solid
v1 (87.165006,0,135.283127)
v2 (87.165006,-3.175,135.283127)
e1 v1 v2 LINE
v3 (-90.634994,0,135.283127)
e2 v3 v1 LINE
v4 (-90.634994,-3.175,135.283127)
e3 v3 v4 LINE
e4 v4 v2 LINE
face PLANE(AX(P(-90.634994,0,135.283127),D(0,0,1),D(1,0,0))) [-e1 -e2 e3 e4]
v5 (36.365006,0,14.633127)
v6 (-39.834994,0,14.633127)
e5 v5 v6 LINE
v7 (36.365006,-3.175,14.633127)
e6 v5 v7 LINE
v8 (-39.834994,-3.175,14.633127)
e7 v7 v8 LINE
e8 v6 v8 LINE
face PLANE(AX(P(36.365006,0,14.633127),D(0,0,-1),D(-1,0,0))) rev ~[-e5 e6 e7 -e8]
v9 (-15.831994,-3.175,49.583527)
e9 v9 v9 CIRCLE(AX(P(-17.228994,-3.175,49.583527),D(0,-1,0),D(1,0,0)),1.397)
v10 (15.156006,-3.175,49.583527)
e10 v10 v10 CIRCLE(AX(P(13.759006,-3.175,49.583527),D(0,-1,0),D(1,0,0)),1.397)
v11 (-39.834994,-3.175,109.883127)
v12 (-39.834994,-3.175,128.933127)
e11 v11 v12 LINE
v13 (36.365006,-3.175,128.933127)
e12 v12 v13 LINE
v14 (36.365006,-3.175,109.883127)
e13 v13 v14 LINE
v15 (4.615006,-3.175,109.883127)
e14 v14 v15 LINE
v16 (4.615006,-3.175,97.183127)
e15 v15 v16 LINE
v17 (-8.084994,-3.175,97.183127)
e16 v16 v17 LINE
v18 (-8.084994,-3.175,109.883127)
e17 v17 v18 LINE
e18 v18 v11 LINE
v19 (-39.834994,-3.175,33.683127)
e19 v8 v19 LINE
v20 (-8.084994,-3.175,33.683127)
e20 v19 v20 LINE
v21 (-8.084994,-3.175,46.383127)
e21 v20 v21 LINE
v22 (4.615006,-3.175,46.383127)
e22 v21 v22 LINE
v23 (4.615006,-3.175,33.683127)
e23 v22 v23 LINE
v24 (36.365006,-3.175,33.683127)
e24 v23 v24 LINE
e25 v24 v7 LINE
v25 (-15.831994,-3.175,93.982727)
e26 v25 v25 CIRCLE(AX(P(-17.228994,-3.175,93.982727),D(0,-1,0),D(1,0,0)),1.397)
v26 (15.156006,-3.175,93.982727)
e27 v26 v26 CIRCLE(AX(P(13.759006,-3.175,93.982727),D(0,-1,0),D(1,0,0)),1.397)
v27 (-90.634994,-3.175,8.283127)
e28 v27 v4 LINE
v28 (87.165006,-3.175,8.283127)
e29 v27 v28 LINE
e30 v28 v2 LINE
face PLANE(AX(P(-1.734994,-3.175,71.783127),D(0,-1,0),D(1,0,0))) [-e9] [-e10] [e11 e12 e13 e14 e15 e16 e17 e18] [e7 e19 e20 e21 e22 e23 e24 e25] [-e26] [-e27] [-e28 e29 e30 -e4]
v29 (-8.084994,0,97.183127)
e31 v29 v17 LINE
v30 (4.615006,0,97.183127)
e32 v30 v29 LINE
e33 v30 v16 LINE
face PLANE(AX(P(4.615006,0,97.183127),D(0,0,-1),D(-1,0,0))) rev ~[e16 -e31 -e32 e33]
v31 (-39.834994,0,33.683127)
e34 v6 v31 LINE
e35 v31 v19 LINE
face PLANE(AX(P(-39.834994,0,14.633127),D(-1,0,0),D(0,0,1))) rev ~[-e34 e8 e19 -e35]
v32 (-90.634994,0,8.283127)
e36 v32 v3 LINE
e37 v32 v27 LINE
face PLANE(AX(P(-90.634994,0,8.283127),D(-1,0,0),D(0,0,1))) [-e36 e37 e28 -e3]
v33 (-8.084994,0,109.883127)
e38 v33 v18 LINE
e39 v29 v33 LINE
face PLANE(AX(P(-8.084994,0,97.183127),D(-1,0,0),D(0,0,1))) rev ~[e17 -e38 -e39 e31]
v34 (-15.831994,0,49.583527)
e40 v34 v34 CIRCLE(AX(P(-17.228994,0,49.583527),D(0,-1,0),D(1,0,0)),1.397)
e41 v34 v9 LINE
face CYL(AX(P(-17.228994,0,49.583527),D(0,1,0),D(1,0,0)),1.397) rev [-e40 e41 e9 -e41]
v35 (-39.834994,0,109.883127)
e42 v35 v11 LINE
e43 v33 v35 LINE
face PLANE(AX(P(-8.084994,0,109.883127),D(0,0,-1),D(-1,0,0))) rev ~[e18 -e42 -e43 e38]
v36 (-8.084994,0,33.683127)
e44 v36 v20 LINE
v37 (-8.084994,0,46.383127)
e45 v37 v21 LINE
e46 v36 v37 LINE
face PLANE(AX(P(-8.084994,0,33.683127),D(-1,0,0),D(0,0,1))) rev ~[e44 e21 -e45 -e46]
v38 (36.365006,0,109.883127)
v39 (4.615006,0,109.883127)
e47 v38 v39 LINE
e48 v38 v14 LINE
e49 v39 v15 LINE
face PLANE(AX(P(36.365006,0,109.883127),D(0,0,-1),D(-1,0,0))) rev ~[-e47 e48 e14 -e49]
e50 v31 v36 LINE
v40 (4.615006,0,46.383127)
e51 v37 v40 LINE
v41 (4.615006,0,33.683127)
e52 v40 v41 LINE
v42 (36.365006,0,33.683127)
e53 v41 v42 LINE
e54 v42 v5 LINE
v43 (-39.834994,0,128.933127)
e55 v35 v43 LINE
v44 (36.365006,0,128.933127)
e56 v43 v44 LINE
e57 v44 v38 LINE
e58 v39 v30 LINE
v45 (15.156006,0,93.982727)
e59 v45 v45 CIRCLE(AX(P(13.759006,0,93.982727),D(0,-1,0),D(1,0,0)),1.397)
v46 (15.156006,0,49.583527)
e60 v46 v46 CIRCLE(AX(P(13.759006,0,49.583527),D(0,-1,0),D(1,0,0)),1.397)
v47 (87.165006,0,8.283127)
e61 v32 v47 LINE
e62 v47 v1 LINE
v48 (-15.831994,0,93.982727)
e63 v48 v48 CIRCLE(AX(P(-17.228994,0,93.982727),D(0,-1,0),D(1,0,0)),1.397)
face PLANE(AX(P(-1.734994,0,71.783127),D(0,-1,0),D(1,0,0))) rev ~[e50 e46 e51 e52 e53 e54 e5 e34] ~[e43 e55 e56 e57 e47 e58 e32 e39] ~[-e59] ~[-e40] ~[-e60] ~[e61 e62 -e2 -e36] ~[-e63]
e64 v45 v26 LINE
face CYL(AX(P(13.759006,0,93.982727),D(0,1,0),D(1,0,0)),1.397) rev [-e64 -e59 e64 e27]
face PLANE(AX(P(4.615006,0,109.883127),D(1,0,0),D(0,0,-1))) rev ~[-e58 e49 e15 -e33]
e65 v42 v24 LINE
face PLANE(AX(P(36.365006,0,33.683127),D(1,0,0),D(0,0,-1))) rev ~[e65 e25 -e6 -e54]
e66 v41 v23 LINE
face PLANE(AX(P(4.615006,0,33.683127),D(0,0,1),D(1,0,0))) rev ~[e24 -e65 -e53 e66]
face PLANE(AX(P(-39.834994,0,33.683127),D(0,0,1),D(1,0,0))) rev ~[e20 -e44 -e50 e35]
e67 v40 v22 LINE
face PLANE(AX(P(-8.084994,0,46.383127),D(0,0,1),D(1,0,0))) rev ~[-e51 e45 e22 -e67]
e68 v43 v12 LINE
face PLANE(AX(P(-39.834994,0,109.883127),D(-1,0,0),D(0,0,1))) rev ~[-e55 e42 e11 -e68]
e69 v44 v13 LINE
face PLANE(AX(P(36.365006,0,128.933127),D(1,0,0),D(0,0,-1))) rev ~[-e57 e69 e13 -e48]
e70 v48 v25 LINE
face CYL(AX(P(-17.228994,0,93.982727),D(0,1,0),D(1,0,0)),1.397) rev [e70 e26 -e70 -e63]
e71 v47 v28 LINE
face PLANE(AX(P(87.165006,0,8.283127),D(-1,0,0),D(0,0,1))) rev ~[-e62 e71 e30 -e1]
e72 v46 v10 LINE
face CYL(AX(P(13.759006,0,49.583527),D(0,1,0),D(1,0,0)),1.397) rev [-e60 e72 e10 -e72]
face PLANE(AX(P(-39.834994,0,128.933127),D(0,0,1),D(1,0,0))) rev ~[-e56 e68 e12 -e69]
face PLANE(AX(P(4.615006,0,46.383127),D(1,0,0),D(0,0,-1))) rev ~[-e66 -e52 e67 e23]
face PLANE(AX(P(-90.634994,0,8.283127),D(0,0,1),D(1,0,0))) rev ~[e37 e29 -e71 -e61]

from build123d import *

# Parameters (mm, degrees)
F0_W     = 177.8
F0_H     = 127
F0_R     = 1.397
F1_DEPTH = 3.175


# Not quite as in the source:
# - a feature names something its author has since deleted; it is built from what else it names


with BuildPart() as f1:
    # F0 (on Front) → F1 (new body)
    with BuildSketch(Plane.XZ):
        with Locations((-1.7349944949, 71.7831266678)):
            Rectangle(F0_W, F0_H)
        with Locations((-17.2289944949, 49.5835266678)):
            Circle(F0_R, mode=Mode.SUBTRACT)
        Polygon((-39.8349944949, 14.6331266678), (-39.8349944949, 33.6831266678), (-8.0849944949, 33.6831266678), (-8.0849944949, 46.3831266678), (4.6150055051, 46.3831266678), (4.6150055051, 33.6831266678), (36.3650055051, 33.6831266678), (36.3650055051, 14.6331266678), align=None, mode=Mode.SUBTRACT)
        with Locations((13.7590055051, 49.5835266678)):
            Circle(F0_R, mode=Mode.SUBTRACT)
        with Locations((-17.2289944949, 93.9827266678)):
            Circle(F0_R, mode=Mode.SUBTRACT)
        Polygon((-39.8349944949, 109.8831266678), (-39.8349944949, 128.9331266678), (36.3650055051, 128.9331266678), (36.3650055051, 109.8831266678), (4.6150055051, 109.8831266678), (4.6150055051, 97.1831266678), (-8.0849944949, 97.1831266678), (-8.0849944949, 109.8831266678), align=None, mode=Mode.SUBTRACT)
        with Locations((13.7590055051, 93.9827266678)):
            Circle(F0_R, mode=Mode.SUBTRACT)
    extrude(amount=F1_DEPTH)


solid = f1.part
